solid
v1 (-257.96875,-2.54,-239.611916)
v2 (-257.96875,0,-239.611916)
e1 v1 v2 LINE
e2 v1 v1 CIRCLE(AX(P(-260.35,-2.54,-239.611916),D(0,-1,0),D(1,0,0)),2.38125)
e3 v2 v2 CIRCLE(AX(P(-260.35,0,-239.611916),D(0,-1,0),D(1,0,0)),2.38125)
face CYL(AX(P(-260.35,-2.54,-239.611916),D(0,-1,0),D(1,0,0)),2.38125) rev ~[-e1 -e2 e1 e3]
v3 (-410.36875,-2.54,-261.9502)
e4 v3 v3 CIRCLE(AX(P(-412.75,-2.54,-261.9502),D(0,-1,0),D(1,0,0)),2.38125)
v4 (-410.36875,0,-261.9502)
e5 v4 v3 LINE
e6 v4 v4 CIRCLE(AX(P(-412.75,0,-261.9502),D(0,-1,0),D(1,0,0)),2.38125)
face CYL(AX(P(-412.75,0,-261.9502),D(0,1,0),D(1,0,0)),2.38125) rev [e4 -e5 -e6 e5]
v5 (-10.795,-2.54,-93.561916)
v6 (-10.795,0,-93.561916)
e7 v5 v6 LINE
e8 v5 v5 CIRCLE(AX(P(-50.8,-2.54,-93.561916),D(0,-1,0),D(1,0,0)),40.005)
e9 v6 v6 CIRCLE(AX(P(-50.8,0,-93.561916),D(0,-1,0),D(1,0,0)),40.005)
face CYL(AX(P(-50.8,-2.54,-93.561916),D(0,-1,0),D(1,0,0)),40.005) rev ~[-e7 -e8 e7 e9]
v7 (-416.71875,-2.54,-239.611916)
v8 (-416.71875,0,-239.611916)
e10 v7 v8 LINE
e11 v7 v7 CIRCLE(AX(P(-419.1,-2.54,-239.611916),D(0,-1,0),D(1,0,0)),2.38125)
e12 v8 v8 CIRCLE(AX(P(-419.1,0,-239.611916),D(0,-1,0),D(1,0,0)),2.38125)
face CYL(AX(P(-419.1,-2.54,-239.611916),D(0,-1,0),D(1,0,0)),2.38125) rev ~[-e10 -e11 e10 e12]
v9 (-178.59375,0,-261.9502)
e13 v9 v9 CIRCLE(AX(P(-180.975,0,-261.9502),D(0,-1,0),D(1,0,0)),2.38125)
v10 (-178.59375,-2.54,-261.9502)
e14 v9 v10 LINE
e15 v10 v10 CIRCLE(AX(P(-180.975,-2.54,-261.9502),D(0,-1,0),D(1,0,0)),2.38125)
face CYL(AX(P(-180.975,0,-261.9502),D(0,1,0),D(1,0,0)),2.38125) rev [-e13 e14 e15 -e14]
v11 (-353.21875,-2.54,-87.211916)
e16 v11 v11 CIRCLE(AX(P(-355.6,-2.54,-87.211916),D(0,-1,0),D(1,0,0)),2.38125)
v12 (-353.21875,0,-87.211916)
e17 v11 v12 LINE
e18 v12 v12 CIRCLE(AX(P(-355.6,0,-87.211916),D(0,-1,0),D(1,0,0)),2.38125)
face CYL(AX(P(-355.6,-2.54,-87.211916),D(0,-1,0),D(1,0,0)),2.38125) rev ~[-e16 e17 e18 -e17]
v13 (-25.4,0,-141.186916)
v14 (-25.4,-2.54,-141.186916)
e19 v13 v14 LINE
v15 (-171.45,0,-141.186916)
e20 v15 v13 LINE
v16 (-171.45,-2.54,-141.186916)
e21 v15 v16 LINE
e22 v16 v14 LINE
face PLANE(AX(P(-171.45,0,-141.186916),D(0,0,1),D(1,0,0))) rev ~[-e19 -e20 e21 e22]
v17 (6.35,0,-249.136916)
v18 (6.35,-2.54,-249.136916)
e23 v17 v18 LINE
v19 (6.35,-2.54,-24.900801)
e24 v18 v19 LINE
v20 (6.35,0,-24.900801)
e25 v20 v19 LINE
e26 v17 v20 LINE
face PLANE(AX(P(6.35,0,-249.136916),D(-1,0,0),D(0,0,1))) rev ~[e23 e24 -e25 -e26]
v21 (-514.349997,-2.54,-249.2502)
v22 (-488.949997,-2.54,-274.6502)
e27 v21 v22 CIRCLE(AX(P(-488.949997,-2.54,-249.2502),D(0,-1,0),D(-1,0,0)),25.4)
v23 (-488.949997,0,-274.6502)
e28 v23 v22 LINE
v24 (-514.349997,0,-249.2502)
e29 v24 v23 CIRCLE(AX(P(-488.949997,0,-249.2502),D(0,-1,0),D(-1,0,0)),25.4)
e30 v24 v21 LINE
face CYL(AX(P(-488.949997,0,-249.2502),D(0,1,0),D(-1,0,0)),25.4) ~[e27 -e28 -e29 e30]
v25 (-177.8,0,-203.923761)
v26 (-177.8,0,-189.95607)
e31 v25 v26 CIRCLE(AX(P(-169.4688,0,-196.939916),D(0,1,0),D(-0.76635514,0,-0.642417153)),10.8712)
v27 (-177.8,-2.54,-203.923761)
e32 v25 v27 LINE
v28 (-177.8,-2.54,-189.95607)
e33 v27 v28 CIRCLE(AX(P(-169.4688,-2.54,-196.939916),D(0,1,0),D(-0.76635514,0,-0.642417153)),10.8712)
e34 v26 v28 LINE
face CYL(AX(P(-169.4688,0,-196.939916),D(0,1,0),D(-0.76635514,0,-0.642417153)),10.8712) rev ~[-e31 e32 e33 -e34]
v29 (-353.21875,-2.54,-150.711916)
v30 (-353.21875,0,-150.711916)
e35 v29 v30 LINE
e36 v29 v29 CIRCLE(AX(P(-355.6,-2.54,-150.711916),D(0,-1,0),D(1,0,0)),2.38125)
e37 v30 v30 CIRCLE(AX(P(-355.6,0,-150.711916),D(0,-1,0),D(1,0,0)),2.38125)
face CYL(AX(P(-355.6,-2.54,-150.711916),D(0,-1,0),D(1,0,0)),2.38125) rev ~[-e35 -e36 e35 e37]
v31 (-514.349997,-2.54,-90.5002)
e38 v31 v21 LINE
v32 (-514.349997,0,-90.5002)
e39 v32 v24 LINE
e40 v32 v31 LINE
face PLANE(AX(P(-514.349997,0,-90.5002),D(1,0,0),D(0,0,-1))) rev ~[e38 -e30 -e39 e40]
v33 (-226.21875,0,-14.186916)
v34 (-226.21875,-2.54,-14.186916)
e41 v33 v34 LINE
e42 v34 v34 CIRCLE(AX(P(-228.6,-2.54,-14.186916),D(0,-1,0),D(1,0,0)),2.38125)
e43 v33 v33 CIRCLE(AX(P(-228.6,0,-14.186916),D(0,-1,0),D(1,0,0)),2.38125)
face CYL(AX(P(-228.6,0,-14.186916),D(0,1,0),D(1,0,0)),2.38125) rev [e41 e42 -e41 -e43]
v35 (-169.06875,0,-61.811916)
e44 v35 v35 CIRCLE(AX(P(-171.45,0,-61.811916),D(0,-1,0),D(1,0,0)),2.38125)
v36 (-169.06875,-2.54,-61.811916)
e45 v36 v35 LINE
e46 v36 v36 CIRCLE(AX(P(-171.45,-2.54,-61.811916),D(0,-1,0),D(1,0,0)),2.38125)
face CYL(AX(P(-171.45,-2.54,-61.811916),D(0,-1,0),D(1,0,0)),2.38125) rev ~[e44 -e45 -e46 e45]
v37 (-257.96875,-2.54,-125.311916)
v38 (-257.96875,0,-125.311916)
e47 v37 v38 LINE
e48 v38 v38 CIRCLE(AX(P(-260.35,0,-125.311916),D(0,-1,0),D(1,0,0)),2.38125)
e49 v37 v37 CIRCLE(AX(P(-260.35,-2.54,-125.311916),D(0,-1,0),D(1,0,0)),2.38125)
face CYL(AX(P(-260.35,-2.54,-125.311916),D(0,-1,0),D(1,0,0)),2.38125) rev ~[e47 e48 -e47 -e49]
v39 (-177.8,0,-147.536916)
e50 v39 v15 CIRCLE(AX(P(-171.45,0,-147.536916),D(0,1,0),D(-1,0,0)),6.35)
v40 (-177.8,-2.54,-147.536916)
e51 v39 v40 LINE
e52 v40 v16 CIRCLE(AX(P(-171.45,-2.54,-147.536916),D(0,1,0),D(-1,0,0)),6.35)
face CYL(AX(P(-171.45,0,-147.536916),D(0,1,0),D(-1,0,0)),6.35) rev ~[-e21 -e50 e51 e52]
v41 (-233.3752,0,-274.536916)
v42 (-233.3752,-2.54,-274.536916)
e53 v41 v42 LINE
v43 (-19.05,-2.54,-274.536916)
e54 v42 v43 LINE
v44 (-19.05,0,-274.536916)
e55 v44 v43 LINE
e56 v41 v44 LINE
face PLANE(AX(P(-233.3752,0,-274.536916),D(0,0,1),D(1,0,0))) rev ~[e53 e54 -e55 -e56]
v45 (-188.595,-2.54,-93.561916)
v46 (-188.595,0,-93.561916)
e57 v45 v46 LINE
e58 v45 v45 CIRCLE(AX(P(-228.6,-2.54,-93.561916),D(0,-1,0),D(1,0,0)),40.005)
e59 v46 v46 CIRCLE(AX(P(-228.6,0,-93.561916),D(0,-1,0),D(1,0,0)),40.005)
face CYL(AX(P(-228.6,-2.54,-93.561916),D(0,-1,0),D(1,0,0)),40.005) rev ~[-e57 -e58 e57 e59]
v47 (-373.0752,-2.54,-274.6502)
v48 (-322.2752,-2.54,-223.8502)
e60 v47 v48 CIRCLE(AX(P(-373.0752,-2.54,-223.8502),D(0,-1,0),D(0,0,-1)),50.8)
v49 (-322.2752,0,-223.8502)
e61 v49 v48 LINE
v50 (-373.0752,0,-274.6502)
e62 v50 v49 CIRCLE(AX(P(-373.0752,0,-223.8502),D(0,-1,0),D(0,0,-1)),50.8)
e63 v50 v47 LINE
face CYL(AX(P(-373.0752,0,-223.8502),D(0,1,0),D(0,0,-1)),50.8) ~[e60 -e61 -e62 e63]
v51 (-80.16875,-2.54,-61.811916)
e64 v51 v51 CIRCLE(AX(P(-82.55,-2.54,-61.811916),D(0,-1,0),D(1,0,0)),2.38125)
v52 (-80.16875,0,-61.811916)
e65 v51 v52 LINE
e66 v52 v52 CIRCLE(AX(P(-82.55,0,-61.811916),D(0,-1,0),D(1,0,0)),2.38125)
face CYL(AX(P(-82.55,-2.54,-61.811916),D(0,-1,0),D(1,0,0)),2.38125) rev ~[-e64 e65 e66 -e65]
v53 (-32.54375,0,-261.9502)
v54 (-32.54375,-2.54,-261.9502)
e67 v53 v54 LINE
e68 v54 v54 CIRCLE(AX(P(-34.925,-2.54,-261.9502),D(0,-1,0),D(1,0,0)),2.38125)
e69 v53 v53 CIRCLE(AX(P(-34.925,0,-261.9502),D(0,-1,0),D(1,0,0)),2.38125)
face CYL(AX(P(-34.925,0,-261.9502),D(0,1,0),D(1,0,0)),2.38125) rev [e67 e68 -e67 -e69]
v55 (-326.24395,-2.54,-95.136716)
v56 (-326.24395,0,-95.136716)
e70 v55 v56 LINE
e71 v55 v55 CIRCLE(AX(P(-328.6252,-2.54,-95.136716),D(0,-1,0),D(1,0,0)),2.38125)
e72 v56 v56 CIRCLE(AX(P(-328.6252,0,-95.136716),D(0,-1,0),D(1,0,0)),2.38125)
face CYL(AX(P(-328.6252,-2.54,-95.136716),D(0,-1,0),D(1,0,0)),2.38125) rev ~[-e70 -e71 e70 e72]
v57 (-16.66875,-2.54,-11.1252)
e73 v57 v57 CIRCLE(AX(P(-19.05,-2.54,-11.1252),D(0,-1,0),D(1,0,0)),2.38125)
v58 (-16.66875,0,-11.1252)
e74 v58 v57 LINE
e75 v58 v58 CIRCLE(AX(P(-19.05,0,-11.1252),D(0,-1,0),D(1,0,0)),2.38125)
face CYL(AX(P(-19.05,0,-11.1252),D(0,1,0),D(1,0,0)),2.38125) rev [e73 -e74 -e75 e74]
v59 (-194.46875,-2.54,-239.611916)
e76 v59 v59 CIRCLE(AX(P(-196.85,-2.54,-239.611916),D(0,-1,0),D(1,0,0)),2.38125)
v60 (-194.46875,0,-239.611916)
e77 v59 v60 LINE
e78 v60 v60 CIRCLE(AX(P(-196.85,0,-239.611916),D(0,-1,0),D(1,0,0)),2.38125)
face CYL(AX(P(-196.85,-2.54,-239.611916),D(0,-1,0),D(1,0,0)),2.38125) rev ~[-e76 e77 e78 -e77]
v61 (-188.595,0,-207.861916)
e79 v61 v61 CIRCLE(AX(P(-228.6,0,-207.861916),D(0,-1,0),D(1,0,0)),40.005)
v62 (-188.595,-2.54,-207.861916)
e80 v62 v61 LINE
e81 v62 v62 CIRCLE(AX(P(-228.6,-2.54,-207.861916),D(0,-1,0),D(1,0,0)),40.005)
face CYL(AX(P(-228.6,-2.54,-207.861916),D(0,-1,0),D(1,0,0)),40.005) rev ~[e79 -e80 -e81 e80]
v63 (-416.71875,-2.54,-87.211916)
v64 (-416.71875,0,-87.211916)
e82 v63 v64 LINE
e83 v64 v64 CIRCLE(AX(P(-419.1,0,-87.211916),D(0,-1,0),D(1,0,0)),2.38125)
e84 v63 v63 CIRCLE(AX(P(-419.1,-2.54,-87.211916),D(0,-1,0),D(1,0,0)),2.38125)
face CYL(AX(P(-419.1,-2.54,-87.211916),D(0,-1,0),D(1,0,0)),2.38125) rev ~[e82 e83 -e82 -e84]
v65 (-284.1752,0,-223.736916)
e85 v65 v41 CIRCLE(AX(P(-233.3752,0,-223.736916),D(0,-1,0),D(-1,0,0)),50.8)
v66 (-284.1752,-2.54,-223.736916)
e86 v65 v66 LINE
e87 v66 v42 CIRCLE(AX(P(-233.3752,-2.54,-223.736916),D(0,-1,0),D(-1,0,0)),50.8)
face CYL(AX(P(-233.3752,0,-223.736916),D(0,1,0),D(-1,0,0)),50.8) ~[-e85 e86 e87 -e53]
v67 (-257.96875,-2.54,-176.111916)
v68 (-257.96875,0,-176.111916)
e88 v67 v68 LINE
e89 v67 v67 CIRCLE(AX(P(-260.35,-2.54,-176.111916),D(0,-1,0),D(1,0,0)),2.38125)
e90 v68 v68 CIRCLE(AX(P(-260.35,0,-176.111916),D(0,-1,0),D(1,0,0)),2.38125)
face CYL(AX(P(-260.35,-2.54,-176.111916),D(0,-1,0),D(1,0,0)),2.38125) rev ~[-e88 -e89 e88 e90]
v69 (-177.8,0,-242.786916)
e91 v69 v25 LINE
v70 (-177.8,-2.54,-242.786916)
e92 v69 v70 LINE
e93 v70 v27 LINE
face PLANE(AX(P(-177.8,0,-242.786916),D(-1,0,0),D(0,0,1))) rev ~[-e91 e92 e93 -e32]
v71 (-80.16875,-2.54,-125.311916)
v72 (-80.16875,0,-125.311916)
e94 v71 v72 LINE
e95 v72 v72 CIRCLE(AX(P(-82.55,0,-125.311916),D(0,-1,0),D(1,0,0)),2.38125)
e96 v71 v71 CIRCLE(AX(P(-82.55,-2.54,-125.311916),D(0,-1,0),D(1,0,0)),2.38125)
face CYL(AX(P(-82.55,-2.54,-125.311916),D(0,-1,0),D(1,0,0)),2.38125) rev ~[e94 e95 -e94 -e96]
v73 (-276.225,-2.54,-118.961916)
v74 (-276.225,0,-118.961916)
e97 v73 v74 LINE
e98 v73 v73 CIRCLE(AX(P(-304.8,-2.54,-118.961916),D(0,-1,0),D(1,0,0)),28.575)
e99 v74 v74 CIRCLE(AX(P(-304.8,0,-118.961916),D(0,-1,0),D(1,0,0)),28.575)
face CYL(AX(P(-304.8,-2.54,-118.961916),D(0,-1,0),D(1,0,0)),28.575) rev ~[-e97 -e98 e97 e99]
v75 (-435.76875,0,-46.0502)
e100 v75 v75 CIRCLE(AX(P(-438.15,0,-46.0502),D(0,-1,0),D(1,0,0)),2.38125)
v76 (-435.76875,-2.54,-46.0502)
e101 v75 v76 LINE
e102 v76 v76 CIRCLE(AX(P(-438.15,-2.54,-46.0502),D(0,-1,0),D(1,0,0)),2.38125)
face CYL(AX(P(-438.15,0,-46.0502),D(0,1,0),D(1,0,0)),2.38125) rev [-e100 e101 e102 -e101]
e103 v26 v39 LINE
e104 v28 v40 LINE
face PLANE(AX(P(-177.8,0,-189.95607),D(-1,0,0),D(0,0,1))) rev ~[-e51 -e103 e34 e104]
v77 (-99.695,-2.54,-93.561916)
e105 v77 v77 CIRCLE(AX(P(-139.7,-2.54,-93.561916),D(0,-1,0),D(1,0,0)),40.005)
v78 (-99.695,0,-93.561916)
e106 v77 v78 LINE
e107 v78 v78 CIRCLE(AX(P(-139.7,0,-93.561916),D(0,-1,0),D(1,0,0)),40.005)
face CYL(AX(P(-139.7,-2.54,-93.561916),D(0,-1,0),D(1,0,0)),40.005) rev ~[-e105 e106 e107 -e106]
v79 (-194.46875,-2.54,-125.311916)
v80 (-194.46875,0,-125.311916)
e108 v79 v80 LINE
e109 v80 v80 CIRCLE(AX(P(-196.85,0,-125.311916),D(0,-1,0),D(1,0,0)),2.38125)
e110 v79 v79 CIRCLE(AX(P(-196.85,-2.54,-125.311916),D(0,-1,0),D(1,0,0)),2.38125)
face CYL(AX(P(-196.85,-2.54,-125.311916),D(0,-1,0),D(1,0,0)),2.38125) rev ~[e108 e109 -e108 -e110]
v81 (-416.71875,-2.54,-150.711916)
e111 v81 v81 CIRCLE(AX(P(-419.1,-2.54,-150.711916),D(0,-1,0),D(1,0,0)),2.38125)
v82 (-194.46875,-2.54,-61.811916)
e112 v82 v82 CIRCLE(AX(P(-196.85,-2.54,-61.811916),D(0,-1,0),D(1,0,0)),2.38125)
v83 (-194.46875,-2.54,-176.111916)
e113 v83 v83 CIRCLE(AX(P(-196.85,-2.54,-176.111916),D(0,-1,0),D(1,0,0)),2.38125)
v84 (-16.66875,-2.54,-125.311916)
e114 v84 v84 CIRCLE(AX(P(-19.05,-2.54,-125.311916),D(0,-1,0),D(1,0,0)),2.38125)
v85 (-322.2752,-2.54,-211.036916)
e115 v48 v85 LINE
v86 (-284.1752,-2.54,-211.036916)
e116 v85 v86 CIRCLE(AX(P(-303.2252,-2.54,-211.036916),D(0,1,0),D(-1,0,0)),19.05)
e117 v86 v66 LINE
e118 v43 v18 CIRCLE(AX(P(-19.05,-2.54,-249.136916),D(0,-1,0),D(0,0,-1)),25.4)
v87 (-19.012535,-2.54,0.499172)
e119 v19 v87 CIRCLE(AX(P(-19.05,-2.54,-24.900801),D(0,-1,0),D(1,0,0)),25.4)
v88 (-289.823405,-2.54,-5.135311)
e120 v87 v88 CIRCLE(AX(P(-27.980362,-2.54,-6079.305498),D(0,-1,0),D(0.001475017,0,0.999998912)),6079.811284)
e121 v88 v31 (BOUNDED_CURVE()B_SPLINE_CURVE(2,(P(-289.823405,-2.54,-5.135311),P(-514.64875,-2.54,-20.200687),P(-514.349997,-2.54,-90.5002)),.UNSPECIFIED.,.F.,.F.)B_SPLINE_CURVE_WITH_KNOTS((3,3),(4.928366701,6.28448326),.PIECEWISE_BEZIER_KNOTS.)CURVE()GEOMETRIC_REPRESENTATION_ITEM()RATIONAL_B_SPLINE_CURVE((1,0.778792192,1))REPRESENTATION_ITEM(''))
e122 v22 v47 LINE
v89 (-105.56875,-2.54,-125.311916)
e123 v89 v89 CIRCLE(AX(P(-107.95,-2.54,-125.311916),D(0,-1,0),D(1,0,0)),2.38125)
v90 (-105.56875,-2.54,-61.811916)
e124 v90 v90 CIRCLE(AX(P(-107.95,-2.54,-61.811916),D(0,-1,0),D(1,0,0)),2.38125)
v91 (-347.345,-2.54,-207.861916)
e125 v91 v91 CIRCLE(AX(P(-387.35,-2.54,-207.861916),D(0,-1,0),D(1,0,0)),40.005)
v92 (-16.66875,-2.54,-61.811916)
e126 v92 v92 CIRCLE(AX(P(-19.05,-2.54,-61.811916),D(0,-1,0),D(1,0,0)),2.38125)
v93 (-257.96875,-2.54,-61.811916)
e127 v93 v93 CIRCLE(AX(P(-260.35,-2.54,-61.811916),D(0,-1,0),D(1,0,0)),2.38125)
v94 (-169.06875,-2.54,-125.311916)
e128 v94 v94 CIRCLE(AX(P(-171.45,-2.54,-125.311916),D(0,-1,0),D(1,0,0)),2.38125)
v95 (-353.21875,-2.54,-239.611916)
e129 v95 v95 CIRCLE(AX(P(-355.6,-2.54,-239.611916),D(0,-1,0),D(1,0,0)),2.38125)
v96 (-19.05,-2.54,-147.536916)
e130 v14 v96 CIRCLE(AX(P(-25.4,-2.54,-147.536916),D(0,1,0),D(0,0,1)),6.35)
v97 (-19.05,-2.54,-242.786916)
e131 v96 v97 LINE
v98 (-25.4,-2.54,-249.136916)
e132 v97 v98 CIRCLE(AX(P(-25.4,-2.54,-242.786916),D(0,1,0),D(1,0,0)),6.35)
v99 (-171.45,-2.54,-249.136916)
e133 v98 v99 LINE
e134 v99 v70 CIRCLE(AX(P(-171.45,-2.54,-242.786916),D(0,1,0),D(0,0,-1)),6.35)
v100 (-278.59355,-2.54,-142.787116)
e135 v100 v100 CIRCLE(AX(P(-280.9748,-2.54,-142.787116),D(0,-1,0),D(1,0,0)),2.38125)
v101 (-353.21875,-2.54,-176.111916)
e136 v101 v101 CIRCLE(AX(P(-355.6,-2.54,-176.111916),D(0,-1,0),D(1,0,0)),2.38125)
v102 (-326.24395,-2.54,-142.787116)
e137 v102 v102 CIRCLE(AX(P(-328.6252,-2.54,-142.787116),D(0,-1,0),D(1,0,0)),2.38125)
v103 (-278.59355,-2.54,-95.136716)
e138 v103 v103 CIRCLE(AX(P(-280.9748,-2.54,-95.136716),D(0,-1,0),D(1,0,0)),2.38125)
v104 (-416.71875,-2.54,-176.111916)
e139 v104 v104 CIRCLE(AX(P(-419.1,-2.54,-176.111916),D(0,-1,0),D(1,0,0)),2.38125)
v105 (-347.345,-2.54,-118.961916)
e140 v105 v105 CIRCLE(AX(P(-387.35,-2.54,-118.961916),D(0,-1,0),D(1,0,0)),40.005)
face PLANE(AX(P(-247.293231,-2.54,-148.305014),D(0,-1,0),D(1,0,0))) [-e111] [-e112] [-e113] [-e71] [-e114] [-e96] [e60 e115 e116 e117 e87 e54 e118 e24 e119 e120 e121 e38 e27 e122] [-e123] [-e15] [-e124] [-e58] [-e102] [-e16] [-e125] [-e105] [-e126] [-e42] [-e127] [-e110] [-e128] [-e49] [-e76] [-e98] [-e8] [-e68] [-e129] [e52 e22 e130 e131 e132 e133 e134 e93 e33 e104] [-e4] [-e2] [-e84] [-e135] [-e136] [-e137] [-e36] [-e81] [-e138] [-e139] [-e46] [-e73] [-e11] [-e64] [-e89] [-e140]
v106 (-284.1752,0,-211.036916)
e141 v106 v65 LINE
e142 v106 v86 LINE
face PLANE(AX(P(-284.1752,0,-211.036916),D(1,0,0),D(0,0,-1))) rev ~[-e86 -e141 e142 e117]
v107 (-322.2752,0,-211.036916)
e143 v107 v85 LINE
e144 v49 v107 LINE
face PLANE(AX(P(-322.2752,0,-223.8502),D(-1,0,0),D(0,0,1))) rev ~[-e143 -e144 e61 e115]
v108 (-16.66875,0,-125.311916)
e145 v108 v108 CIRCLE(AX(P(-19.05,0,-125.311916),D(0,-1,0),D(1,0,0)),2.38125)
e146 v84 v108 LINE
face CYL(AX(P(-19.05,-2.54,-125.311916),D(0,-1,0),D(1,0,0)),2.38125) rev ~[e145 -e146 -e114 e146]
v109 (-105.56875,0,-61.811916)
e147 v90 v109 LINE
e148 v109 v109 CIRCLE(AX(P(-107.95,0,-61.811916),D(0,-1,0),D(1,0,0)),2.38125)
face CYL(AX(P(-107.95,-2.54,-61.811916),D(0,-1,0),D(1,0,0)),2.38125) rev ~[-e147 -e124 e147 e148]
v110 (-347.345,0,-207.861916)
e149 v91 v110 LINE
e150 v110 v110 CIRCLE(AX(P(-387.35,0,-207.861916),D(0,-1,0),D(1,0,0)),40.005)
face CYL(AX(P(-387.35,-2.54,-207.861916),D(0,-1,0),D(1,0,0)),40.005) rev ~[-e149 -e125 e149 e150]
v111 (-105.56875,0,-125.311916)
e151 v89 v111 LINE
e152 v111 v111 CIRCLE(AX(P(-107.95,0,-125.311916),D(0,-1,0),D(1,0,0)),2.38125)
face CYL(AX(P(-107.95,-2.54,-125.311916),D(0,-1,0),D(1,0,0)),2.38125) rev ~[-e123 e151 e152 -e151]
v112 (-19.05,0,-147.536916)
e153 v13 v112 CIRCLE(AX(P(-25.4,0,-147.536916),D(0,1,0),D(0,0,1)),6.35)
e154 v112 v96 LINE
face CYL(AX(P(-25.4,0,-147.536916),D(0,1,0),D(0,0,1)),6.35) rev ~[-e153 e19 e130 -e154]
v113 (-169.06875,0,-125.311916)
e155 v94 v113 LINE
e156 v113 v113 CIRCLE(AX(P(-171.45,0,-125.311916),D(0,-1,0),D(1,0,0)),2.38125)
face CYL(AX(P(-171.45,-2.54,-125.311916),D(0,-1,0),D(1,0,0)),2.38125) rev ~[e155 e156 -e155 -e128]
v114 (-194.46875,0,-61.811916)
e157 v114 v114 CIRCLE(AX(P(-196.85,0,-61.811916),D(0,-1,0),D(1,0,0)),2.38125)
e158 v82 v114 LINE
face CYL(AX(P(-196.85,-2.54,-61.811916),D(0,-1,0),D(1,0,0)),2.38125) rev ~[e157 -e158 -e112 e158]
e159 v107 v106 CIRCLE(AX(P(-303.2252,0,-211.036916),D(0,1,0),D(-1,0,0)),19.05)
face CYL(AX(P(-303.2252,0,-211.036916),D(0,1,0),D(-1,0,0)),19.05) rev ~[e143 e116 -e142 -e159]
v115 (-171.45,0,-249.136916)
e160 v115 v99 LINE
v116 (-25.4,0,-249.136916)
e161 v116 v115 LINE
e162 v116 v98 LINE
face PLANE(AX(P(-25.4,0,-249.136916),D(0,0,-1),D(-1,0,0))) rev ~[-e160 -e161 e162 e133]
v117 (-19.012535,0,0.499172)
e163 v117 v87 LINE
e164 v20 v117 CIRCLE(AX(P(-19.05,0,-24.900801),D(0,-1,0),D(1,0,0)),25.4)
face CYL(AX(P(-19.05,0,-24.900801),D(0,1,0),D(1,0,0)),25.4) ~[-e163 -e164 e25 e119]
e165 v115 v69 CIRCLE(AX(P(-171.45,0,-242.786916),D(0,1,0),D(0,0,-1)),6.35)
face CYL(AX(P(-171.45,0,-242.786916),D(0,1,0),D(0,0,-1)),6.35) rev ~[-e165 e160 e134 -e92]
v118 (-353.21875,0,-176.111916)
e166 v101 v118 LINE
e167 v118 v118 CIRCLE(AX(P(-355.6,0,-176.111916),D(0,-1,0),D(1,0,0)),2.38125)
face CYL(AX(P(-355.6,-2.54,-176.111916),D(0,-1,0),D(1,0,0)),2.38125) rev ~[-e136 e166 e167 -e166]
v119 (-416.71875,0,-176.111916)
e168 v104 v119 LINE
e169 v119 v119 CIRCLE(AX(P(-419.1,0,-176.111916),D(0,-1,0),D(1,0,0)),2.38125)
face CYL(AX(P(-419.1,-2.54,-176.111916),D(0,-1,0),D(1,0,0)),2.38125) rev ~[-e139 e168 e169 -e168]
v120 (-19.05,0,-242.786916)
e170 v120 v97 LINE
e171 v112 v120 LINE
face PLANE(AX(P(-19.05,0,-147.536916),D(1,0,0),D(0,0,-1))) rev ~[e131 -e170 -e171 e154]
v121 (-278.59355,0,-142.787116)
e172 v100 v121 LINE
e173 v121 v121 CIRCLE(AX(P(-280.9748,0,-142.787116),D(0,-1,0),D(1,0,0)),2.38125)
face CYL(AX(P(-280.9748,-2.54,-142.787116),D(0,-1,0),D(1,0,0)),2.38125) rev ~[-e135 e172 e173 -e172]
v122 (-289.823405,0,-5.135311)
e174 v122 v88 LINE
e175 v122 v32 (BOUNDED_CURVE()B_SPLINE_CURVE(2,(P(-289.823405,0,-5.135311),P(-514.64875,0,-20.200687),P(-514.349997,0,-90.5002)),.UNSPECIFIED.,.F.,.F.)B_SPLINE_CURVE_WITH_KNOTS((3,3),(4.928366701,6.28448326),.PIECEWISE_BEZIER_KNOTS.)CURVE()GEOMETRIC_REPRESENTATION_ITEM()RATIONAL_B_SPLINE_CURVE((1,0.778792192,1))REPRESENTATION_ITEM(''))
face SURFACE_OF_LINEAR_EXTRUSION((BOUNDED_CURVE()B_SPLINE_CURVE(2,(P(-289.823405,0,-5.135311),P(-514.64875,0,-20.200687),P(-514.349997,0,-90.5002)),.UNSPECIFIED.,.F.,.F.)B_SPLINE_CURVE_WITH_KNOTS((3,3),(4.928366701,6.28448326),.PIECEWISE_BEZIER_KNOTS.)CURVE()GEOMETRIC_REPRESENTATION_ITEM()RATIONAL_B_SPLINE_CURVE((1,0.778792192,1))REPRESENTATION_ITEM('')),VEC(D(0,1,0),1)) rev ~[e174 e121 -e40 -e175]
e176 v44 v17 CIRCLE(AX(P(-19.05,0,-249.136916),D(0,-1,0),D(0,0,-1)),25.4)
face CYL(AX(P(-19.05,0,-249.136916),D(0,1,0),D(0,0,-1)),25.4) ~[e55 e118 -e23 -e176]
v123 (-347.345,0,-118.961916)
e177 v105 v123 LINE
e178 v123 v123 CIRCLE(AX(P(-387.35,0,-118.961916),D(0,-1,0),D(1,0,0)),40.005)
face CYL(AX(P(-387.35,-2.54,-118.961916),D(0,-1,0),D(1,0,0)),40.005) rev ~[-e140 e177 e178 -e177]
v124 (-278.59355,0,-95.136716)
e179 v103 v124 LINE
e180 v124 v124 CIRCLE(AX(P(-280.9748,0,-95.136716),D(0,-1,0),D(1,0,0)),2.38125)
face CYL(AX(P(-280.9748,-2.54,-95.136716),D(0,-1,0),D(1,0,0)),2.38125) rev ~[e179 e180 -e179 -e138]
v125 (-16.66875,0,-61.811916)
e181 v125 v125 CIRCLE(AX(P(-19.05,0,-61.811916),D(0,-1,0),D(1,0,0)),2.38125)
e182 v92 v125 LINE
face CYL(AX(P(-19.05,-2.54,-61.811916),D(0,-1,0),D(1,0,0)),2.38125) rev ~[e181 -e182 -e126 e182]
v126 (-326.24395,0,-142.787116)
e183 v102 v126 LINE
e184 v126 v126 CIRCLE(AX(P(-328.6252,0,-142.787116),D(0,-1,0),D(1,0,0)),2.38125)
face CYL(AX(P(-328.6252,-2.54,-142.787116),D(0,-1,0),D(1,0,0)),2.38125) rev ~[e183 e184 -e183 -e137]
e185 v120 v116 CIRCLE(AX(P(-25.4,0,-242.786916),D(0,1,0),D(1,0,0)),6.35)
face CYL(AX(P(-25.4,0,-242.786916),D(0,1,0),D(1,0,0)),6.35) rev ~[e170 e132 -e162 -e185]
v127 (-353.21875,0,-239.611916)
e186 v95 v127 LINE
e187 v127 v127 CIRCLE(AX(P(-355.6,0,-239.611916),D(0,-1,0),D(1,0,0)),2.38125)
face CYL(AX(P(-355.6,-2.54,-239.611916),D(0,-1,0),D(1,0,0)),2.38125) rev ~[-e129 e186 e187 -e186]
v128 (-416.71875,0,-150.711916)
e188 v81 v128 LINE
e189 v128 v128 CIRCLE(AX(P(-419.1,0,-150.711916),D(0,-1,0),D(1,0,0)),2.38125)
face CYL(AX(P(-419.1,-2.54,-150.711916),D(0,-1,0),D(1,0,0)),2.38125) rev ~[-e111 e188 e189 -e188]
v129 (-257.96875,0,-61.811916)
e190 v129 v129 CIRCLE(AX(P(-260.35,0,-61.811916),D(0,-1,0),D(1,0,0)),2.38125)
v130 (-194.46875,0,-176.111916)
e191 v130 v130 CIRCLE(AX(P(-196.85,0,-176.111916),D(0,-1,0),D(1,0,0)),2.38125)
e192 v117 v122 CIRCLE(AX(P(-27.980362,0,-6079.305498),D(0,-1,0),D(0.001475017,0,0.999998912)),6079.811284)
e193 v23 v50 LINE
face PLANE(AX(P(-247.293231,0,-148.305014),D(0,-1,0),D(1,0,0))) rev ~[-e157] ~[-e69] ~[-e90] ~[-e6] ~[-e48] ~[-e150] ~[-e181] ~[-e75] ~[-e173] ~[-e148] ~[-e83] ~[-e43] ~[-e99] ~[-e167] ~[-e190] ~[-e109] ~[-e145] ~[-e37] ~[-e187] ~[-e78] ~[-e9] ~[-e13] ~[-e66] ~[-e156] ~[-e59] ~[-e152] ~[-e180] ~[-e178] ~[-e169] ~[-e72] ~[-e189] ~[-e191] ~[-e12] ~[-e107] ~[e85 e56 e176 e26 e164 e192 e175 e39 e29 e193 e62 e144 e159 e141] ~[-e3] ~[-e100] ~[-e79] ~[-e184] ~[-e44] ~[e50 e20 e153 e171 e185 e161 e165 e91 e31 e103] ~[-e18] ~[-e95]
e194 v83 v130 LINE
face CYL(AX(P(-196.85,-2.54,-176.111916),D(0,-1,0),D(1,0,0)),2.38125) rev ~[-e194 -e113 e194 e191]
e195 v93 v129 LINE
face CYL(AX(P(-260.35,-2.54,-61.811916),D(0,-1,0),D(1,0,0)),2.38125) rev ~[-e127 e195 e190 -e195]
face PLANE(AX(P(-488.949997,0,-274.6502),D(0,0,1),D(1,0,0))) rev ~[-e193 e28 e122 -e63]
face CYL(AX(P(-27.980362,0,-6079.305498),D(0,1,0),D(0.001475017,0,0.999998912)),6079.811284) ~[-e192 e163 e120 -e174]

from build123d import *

# Parameters (mm, degrees)
F0_R     = 2.38125
F1_DEPTH = 2.54
F2_R     = 40.005
F2_R_2   = 28.575
F2_R_3   = 2.38125
F3_DEPTH = 2.5410001


with BuildPart() as f1:
    # F0 (on Front) → F1 (new body)
    with BuildSketch(Plane.XZ):
        with BuildLine():
            ThreePointArc((6.3499999233, -24.9008008357), (-1.0762466814, -6.9535395158), (-19.0125346344, 0.4991715332))
            ThreePointArc((-19.0125346344, 0.4991715332), (-154.4493523287, -0.8097271588), (-289.8234049708, -5.1353108434))
            add(Edge.make_bspline(
                [(-289.8234049708, -5.1353108434), (-514.6487503932, -20.2006873557), (-514.3499970436, -90.5002)],
                knots=[4.9283667006, 4.9283667006, 4.9283667006, 6.2844832596, 6.2844832596, 6.2844832596], degree=2, weights=[1, 0.7787921925, 1]))
            Line((-514.3499970436, -90.5002), (-514.3499970436, -249.2502))
            ThreePointArc((-514.3499970436, -249.2502), (-506.9105092857, -267.2107122421), (-488.9499970436, -274.6502))
            Line((-488.9499970436, -274.6502), (-373.0752, -274.6502))
            ThreePointArc((-373.0752, -274.6502), (-337.1541755157, -259.7712244843), (-322.2752, -223.8502))
            Line((-322.2752, -223.8502), (-322.2752, -211.0369156084))
            ThreePointArc((-322.2752, -211.0369156084), (-303.2252, -191.9869156084), (-284.1752, -211.0369156084))
            Line((-284.1752, -211.0369156084), (-284.1752, -223.7369156084))
            ThreePointArc((-284.1752, -223.7369156084), (-269.2962244843, -259.6579400927), (-233.3752, -274.5369156084))
            Line((-233.3752, -274.5369156084), (-19.0500000767, -274.5369156084))
            ThreePointArc((-19.0500000767, -274.5369156084), (-1.0894878346, -267.0974278505), (6.3499999233, -249.1369156084))
            Line((6.3499999233, -249.1369156084), (6.3499999233, -24.9008008357))
        make_face()
        with Locations((-412.75, -261.9502)):
            Circle(F0_R, mode=Mode.SUBTRACT)
        with Locations((-180.975, -261.9502)):
            Circle(F0_R, mode=Mode.SUBTRACT)
        with Locations((-34.925, -261.9502)):
            Circle(F0_R, mode=Mode.SUBTRACT)
        with BuildLine():
            ThreePointArc((-177.8000000767, -147.5369156084), (-175.9401281373, -143.0467875478), (-171.4500000767, -141.1869156084))
            Line((-171.4500000767, -141.1869156084), (-25.4000000767, -141.1869156084))
            ThreePointArc((-25.4000000767, -141.1869156084), (-20.9098720162, -143.0467875478), (-19.0500000767, -147.5369156084))
            Line((-19.0500000767, -147.5369156084), (-19.0500000767, -242.7869156084))
            ThreePointArc((-19.0500000767, -242.7869156084), (-20.9098720162, -247.2770436689), (-25.4000000767, -249.1369156084))
            Line((-25.4000000767, -249.1369156084), (-171.4500000767, -249.1369156084))
            ThreePointArc((-171.4500000767, -249.1369156084), (-175.9401281373, -247.2770436689), (-177.8000000767, -242.7869156084))
            Line((-177.8000000767, -242.7869156084), (-177.8000000767, -203.9237609675))
            ThreePointArc((-177.8000000767, -203.9237609675), (-180.3400000767, -196.9399156084), (-177.8000000767, -189.9560702493))
            Line((-177.8000000767, -189.9560702493), (-177.8000000767, -147.5369156084))
        make_face(mode=Mode.SUBTRACT)
        with Locations((-438.15, -46.0502)):
            Circle(F0_R, mode=Mode.SUBTRACT)
        with Locations((-228.6, -14.1869156084)):
            Circle(F0_R, mode=Mode.SUBTRACT)
        with Locations((-19.05, -11.1252)):
            Circle(F0_R, mode=Mode.SUBTRACT)
    extrude(amount=F1_DEPTH)

    # F2 (on face) → F3 (cut, through all)
    with BuildSketch(Plane.XZ.offset(2.54)):
        with Locations((-50.8, -93.5619156084)):
            Circle(F2_R)
        with Locations((-139.7, -93.5619156084)):
            Circle(F2_R)
        with Locations((-228.6, -93.5619156084)):
            Circle(F2_R)
        with Locations((-304.8, -118.9619156084)):
            Circle(F2_R_2)
        with Locations((-19.05, -125.3119156084)):
            Circle(F2_R_3)
        with Locations((-82.5499999959, -125.3119156124)):
            Circle(F2_R_3)
        with Locations((-82.5500000081, -61.8119156165)):
            Circle(F2_R_3)
        with Locations((-19.0500000122, -61.8119155962)):
            Circle(F2_R_3)
        with Locations((-280.9748, -142.7871156084)):
            Circle(F2_R_3)
        with Locations((-280.9748, -95.1367156084)):
            Circle(F2_R_3)
        with Locations((-328.6252, -95.1367156084)):
            Circle(F2_R_3)
        with Locations((-328.6252, -142.7871156084)):
            Circle(F2_R_3)
        with Locations((-228.6, -207.8619156084)):
            Circle(F2_R)
        with Locations((-387.35, -118.9619156084)):
            Circle(F2_R)
        with Locations((-387.35, -207.8619156084)):
            Circle(F2_R)
        with Locations((-171.4499999959, -125.3119156124)):
            Circle(F2_R_3)
        with Locations((-107.95, -125.3119156084)):
            Circle(F2_R_3)
        with Locations((-107.9500000122, -61.8119155962)):
            Circle(F2_R_3)
        with Locations((-171.4500000081, -61.8119156165)):
            Circle(F2_R_3)
        with Locations((-260.3499999959, -125.3119156124)):
            Circle(F2_R_3)
        with Locations((-196.85, -125.3119156084)):
            Circle(F2_R_3)
        with Locations((-196.8500000122, -61.8119155962)):
            Circle(F2_R_3)
        with Locations((-260.3500000081, -61.8119156165)):
            Circle(F2_R_3)
        with Locations((-260.3500000081, -176.1119156165)):
            Circle(F2_R_3)
        with Locations((-260.3499999959, -239.6119156124)):
            Circle(F2_R_3)
        with Locations((-196.8500000122, -176.1119155962)):
            Circle(F2_R_3)
        with Locations((-196.85, -239.6119156084)):
            Circle(F2_R_3)
        with Locations((-419.1000000081, -176.1119156165)):
            Circle(F2_R_3)
        with Locations((-355.6000000122, -176.1119155962)):
            Circle(F2_R_3)
        with Locations((-355.6, -239.6119156084)):
            Circle(F2_R_3)
        with Locations((-419.0999999959, -239.6119156124)):
            Circle(F2_R_3)
        with Locations((-355.6, -150.7119156084)):
            Circle(F2_R_3)
        with Locations((-419.1000000081, -87.2119156165)):
            Circle(F2_R_3)
        with Locations((-355.6000000122, -87.2119155962)):
            Circle(F2_R_3)
        with Locations((-419.0999999959, -150.7119156124)):
            Circle(F2_R_3)
    extrude(amount=-F3_DEPTH, mode=Mode.SUBTRACT)


solid = f1.part
